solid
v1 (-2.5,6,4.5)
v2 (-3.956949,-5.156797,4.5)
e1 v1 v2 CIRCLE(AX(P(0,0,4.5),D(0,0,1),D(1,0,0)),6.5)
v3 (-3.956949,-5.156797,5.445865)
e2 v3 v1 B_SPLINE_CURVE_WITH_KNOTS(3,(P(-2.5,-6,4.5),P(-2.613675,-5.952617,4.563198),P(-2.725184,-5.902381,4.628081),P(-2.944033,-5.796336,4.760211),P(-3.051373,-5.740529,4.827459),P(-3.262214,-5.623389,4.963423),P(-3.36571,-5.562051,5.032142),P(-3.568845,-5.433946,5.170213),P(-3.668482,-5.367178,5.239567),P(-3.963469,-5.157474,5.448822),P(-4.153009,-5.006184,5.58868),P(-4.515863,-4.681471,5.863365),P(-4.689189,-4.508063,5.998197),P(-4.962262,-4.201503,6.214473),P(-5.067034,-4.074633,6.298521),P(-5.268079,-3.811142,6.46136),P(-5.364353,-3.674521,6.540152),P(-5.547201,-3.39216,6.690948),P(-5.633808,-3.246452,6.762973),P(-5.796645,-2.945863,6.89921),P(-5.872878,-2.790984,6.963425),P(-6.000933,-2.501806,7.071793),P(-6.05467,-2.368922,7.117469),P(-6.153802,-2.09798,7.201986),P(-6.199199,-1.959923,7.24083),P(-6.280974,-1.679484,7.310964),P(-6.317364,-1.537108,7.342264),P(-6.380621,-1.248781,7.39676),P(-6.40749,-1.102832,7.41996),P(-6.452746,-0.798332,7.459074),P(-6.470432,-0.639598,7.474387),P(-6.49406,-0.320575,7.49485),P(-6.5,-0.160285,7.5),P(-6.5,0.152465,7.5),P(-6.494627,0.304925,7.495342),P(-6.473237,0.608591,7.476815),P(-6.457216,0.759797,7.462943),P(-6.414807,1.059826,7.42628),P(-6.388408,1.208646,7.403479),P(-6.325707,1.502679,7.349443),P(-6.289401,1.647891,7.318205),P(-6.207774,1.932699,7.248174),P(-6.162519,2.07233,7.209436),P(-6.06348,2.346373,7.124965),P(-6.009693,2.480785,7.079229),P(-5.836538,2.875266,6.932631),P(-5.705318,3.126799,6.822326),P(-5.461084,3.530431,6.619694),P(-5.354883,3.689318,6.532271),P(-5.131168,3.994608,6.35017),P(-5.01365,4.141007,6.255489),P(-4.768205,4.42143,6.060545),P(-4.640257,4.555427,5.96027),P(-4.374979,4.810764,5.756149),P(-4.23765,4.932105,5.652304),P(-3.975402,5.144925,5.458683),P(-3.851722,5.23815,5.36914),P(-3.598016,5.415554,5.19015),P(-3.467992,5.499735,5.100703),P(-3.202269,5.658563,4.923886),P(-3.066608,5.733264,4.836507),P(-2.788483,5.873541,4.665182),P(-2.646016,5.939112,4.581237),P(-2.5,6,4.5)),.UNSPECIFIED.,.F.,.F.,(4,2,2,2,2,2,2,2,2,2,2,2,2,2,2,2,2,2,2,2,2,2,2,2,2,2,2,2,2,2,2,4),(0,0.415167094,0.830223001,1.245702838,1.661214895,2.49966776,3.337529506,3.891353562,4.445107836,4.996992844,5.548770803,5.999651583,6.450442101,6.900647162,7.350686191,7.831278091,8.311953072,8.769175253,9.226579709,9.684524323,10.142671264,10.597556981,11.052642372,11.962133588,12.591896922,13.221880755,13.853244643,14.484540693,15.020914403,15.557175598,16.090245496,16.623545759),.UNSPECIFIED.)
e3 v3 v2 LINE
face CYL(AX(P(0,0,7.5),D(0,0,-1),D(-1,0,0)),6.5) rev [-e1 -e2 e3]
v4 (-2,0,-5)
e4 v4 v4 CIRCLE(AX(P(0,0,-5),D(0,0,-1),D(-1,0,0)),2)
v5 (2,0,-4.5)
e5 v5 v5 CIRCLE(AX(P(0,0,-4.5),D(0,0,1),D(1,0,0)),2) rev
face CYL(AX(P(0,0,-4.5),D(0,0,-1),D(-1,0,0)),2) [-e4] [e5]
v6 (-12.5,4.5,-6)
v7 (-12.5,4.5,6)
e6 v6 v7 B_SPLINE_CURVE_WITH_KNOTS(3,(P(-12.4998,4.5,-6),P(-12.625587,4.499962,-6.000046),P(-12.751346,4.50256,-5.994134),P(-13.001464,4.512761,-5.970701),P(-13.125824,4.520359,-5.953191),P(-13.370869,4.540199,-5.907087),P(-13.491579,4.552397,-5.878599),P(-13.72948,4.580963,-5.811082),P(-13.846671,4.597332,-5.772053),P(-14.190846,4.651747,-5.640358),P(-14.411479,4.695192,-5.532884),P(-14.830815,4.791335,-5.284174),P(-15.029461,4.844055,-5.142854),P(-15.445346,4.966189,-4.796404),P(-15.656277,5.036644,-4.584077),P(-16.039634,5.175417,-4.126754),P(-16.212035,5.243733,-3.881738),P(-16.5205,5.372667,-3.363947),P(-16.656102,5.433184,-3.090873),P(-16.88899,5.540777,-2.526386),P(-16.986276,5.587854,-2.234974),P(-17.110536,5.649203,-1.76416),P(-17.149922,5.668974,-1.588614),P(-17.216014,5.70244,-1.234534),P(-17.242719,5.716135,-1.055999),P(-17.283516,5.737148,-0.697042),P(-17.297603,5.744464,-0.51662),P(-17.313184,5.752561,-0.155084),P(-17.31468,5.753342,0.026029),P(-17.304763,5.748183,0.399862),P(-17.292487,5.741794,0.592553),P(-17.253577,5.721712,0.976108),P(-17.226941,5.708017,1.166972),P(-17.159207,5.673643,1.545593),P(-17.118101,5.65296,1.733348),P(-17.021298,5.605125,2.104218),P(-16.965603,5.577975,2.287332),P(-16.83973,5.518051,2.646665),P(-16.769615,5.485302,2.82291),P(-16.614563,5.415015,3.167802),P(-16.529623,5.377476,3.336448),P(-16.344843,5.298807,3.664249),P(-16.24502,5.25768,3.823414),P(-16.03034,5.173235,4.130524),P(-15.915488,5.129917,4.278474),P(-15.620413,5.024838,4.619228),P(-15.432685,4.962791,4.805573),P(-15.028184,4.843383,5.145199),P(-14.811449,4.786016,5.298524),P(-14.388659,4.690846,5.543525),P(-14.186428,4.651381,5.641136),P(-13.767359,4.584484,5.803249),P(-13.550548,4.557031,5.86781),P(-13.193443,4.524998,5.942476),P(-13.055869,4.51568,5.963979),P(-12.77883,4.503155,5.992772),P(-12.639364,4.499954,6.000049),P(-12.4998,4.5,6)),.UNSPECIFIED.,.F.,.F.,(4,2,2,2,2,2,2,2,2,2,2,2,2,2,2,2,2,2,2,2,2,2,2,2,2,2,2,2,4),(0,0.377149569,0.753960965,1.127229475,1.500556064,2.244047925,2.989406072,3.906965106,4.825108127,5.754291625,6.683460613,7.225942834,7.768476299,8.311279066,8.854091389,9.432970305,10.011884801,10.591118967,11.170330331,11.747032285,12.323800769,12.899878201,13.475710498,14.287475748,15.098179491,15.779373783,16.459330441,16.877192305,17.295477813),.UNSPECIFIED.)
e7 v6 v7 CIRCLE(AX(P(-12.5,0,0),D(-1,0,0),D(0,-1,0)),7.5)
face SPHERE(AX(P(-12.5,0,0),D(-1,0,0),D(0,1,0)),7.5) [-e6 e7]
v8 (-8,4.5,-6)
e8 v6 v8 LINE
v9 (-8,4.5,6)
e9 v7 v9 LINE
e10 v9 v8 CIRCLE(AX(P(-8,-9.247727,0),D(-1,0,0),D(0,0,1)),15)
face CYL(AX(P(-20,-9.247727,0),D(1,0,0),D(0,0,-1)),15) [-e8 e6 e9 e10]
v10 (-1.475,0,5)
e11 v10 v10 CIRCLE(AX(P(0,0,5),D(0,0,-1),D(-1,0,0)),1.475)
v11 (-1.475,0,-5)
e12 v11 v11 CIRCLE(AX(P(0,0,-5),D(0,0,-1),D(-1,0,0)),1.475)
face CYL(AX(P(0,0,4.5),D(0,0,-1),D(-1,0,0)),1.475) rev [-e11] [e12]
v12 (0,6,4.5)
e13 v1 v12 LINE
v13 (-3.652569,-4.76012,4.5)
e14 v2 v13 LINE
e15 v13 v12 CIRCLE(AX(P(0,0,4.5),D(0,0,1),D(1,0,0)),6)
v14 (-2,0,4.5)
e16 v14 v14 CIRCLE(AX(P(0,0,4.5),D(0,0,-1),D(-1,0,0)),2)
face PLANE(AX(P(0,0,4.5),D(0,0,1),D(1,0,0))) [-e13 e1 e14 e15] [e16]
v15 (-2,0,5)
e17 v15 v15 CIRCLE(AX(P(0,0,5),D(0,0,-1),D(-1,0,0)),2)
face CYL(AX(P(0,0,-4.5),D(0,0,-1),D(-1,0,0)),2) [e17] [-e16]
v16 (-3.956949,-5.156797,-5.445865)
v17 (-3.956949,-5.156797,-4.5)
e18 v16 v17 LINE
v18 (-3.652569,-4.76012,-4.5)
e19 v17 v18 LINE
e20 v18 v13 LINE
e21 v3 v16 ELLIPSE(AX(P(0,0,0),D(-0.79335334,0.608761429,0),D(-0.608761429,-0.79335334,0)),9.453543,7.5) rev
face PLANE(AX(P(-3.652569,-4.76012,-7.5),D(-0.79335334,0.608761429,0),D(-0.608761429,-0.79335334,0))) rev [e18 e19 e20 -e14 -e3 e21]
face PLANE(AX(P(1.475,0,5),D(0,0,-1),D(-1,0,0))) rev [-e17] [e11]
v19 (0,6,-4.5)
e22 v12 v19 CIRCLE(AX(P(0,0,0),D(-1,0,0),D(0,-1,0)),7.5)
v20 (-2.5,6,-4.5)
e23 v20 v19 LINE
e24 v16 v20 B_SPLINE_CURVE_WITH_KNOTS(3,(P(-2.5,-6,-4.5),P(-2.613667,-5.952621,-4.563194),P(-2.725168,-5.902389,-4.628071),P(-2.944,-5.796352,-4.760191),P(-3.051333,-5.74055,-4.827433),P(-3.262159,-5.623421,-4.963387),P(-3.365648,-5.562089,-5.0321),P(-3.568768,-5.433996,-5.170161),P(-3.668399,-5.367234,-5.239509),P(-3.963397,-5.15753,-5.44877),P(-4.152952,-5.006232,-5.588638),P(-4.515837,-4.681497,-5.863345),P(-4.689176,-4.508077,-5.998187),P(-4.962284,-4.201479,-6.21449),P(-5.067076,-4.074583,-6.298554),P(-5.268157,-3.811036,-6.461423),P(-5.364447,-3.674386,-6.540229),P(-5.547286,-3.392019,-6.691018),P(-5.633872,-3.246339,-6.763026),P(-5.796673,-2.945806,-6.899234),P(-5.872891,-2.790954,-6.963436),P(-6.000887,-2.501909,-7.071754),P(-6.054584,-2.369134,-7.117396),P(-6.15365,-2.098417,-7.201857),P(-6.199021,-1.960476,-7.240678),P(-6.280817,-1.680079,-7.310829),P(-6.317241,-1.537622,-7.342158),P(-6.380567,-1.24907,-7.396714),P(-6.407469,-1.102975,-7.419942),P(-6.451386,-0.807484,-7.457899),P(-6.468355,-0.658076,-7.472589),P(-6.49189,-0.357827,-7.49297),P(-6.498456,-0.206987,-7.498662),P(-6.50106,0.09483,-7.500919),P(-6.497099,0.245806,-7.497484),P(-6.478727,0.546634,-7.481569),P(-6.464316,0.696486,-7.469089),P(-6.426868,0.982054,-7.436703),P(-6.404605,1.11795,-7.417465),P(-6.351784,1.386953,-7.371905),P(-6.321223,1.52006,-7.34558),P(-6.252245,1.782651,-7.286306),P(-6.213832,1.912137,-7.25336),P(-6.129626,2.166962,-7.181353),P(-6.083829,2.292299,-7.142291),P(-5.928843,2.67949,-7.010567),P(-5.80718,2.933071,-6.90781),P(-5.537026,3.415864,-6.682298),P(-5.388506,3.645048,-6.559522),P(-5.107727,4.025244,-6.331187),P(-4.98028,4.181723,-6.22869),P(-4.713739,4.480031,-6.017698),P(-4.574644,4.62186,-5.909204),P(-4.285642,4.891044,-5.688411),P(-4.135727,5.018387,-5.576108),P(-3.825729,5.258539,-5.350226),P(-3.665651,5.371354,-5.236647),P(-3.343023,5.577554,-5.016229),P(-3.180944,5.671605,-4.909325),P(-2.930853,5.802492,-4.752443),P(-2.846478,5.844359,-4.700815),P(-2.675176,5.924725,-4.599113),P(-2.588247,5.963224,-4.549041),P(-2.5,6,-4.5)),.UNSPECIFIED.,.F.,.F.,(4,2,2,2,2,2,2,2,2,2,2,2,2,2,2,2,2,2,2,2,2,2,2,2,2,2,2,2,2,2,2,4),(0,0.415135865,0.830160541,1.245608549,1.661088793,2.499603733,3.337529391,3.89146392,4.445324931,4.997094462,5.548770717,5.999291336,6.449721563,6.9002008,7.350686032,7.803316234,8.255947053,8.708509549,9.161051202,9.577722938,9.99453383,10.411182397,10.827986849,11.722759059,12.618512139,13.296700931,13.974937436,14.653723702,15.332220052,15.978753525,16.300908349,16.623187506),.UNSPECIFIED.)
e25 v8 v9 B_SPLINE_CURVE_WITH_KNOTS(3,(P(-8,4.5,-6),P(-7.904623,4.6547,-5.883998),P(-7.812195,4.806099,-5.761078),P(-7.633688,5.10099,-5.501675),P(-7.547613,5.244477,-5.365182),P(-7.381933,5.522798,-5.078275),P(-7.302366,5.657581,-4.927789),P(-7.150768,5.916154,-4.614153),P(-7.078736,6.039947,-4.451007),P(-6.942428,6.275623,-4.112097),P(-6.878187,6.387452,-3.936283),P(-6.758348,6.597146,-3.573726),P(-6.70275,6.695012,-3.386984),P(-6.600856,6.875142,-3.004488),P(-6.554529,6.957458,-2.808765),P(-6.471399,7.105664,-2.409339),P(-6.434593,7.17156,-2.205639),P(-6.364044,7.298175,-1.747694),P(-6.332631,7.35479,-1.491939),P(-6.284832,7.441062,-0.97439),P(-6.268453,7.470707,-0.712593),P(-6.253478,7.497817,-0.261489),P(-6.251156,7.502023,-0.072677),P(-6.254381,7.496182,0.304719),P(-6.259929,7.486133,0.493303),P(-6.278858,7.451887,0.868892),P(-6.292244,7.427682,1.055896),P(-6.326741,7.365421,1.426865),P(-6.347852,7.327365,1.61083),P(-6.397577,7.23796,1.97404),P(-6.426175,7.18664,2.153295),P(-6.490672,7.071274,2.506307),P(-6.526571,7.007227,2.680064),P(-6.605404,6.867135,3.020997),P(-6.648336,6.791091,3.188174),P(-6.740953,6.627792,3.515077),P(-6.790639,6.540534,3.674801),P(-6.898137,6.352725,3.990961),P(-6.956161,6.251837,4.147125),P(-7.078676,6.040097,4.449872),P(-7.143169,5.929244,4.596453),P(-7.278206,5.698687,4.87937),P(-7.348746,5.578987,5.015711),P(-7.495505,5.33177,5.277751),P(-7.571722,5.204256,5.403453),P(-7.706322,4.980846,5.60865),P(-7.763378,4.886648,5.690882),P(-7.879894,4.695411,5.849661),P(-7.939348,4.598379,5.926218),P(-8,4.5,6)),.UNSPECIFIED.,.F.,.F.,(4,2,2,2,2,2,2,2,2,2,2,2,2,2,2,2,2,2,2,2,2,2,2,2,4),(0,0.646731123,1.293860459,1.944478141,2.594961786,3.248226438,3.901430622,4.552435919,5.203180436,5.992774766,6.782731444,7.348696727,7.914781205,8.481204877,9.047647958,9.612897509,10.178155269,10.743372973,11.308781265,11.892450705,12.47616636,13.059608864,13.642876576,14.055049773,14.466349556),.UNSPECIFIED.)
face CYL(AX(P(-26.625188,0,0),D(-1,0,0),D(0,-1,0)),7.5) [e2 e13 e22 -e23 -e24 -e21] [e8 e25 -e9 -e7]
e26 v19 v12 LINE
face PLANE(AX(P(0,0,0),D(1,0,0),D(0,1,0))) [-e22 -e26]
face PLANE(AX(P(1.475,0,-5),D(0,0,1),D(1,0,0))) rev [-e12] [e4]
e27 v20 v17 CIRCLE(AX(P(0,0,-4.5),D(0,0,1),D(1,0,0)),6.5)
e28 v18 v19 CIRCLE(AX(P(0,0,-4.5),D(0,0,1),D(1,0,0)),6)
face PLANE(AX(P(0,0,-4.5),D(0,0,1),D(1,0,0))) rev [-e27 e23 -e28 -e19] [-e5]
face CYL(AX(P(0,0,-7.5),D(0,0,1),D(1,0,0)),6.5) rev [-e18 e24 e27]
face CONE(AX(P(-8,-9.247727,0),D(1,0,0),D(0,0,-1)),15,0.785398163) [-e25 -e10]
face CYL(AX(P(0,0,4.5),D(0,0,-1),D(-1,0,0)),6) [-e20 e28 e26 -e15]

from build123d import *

# Parameters (mm, degrees)
SKETCH1_R               = 6
SKETCH1_R_2             = 1.475
BOSS_EXTRUDE1_DEPTH     = 4.5
CUT_EXTRUDE2_DEPTH      = 23.638462845
CUT_EXTRUDE2_DEPTH_BACK = 23.638462845
CUT_EXTRUDE1_START      = -6
CUT_EXTRUDE1_DEPTH      = 17.638462912
CHAMFER1_SIZE           = 2
CUT_EXTRUDE3_START      = 4.5
SKETCH9_R               = 6.5
CUT_EXTRUDE3_DEPTH      = 19.138462912
CUT_EXTRUDE4_START      = -4.5
SKETCH9_2_R             = 6.5
CUT_EXTRUDE4_DEPTH      = 19.138462913
SKETCH10_W              = 0.525
SKETCH10_H              = 0.5


with BuildPart() as part:
    # Sketch1 → Boss-Extrude1 (new, symmetric)
    with BuildSketch(Plane.XY):
        Circle(SKETCH1_R)
        Circle(SKETCH1_R_2, mode=Mode.SUBTRACT)
    extrude(amount=BOSS_EXTRUDE1_DEPTH, both=True)


with BuildPart() as body_2:
    # Sketch5 → Revolve1 (revolve)
    with BuildSketch(Plane.XY):
        with BuildLine():
            Line((0, -7.5), (-12.5, -7.5))
            ThreePointArc((-12.5, -7.5), (-17.803300859, -5.303300859), (-20, 0))
            Line((-20, 0), (0, 0))
            Line((0, 0), (0, -7.5))
        make_face()
    revolve(axis=Axis((-26.625188219, 0, 0), (1, 0, 0)))

    # Sketch7 → Cut-Extrude2 (cut, two sides: drawn at the far end of the back side and taken through both)
    with BuildSketch(Plane.XY.offset(-CUT_EXTRUDE2_DEPTH_BACK)):
        with BuildLine():
            Line((-3.652568574, -4.760120042), (-5.75495241, -7.5))
            Line((-5.75495241, -7.5), (0, -7.5))
            Line((0, -7.5), (0, -6))
            ThreePointArc((0, -6), (1.928636792, 5.681580777), (-3.652568574, -4.760120042))
        make_face()
    extrude(amount=CUT_EXTRUDE2_DEPTH + CUT_EXTRUDE2_DEPTH_BACK, mode=Mode.SUBTRACT)


with BuildPart() as part_1:
    add(part.part)

    # Combine1: union body 2
    add(body_2.part)

    # Sketch6 → Cut-Extrude1 (cut, through all)
    with BuildSketch(Plane(origin=(0, 0, 0), x_dir=(0, 0, -1), z_dir=(1, 0, 0)).offset(CUT_EXTRUDE1_START)):
        with BuildLine():
            ThreePointArc((-6, 4.5), (0, 5.752272915), (6, 4.5))
            ThreePointArc((6, 4.5), (0, 7.5), (-6, 4.5))
        make_face()
    extrude(amount=-CUT_EXTRUDE1_DEPTH, mode=Mode.SUBTRACT)

    # Chamfer1
    # the kernel refuses this chamfer: 2 mm, written as the material it adds along each edge
    with BuildSketch(Plane(origin=(-6, -9.247727085, 0), x_dir=(0, 0.7286512742865437, 0.6848848957895012), z_dir=(0, -0.6848848957895012, 0.7286512742865437))) as chamfer1_piece_1_section:
        Polygon((15, CHAMFER1_SIZE), (15 + CHAMFER1_SIZE, 0), (15, 0), align=None)
    chamfer1_piece_1 = revolve(axis=Axis((-6, -9.247727085, 0), (-1, 0, 0)), revolution_arc=86.453111056, mode=Mode.PRIVATE)
    chamfer1_piece_1 = chamfer1_piece_1 & Plane(origin=(-6.733016539, 0, 0), x_dir=(0, -1, 0), z_dir=(-1, 0, 0)) * Cylinder(7.5, 68, mode=Mode.PRIVATE)
    add(chamfer1_piece_1)

    # Sketch9 → Cut-Extrude3 (cut, through all)
    with BuildSketch(Plane.XY.offset(CUT_EXTRUDE3_START)):
        Circle(SKETCH9_R)
    extrude(amount=CUT_EXTRUDE3_DEPTH, mode=Mode.SUBTRACT)

    # Sketch9<2> → Cut-Extrude4 (cut, through all)
    with BuildSketch(Plane.XY.offset(CUT_EXTRUDE4_START)):
        Circle(SKETCH9_2_R)
    extrude(amount=-CUT_EXTRUDE4_DEPTH, mode=Mode.SUBTRACT)

    # Sketch10 → Revolve2 (revolve)
    with BuildSketch(Plane(origin=(0, 0, 0), x_dir=(1, 0, 0), z_dir=(0, 1, 0)), mode=Mode.PRIVATE) as revolve2_sk:
        with Locations((1.7375, 4.75)):
            Rectangle(SKETCH10_W, SKETCH10_H)
        with Locations((1.7375, -4.75)):
            Rectangle(SKETCH10_W, SKETCH10_H)
    revolve(revolve2_sk.sketch.rotate(Axis((0, 0, -4.5), (0, 0, 1)), 180), axis=Axis((0, 0, -4.5), (0, 0, 1)))


solid = part_1.part
